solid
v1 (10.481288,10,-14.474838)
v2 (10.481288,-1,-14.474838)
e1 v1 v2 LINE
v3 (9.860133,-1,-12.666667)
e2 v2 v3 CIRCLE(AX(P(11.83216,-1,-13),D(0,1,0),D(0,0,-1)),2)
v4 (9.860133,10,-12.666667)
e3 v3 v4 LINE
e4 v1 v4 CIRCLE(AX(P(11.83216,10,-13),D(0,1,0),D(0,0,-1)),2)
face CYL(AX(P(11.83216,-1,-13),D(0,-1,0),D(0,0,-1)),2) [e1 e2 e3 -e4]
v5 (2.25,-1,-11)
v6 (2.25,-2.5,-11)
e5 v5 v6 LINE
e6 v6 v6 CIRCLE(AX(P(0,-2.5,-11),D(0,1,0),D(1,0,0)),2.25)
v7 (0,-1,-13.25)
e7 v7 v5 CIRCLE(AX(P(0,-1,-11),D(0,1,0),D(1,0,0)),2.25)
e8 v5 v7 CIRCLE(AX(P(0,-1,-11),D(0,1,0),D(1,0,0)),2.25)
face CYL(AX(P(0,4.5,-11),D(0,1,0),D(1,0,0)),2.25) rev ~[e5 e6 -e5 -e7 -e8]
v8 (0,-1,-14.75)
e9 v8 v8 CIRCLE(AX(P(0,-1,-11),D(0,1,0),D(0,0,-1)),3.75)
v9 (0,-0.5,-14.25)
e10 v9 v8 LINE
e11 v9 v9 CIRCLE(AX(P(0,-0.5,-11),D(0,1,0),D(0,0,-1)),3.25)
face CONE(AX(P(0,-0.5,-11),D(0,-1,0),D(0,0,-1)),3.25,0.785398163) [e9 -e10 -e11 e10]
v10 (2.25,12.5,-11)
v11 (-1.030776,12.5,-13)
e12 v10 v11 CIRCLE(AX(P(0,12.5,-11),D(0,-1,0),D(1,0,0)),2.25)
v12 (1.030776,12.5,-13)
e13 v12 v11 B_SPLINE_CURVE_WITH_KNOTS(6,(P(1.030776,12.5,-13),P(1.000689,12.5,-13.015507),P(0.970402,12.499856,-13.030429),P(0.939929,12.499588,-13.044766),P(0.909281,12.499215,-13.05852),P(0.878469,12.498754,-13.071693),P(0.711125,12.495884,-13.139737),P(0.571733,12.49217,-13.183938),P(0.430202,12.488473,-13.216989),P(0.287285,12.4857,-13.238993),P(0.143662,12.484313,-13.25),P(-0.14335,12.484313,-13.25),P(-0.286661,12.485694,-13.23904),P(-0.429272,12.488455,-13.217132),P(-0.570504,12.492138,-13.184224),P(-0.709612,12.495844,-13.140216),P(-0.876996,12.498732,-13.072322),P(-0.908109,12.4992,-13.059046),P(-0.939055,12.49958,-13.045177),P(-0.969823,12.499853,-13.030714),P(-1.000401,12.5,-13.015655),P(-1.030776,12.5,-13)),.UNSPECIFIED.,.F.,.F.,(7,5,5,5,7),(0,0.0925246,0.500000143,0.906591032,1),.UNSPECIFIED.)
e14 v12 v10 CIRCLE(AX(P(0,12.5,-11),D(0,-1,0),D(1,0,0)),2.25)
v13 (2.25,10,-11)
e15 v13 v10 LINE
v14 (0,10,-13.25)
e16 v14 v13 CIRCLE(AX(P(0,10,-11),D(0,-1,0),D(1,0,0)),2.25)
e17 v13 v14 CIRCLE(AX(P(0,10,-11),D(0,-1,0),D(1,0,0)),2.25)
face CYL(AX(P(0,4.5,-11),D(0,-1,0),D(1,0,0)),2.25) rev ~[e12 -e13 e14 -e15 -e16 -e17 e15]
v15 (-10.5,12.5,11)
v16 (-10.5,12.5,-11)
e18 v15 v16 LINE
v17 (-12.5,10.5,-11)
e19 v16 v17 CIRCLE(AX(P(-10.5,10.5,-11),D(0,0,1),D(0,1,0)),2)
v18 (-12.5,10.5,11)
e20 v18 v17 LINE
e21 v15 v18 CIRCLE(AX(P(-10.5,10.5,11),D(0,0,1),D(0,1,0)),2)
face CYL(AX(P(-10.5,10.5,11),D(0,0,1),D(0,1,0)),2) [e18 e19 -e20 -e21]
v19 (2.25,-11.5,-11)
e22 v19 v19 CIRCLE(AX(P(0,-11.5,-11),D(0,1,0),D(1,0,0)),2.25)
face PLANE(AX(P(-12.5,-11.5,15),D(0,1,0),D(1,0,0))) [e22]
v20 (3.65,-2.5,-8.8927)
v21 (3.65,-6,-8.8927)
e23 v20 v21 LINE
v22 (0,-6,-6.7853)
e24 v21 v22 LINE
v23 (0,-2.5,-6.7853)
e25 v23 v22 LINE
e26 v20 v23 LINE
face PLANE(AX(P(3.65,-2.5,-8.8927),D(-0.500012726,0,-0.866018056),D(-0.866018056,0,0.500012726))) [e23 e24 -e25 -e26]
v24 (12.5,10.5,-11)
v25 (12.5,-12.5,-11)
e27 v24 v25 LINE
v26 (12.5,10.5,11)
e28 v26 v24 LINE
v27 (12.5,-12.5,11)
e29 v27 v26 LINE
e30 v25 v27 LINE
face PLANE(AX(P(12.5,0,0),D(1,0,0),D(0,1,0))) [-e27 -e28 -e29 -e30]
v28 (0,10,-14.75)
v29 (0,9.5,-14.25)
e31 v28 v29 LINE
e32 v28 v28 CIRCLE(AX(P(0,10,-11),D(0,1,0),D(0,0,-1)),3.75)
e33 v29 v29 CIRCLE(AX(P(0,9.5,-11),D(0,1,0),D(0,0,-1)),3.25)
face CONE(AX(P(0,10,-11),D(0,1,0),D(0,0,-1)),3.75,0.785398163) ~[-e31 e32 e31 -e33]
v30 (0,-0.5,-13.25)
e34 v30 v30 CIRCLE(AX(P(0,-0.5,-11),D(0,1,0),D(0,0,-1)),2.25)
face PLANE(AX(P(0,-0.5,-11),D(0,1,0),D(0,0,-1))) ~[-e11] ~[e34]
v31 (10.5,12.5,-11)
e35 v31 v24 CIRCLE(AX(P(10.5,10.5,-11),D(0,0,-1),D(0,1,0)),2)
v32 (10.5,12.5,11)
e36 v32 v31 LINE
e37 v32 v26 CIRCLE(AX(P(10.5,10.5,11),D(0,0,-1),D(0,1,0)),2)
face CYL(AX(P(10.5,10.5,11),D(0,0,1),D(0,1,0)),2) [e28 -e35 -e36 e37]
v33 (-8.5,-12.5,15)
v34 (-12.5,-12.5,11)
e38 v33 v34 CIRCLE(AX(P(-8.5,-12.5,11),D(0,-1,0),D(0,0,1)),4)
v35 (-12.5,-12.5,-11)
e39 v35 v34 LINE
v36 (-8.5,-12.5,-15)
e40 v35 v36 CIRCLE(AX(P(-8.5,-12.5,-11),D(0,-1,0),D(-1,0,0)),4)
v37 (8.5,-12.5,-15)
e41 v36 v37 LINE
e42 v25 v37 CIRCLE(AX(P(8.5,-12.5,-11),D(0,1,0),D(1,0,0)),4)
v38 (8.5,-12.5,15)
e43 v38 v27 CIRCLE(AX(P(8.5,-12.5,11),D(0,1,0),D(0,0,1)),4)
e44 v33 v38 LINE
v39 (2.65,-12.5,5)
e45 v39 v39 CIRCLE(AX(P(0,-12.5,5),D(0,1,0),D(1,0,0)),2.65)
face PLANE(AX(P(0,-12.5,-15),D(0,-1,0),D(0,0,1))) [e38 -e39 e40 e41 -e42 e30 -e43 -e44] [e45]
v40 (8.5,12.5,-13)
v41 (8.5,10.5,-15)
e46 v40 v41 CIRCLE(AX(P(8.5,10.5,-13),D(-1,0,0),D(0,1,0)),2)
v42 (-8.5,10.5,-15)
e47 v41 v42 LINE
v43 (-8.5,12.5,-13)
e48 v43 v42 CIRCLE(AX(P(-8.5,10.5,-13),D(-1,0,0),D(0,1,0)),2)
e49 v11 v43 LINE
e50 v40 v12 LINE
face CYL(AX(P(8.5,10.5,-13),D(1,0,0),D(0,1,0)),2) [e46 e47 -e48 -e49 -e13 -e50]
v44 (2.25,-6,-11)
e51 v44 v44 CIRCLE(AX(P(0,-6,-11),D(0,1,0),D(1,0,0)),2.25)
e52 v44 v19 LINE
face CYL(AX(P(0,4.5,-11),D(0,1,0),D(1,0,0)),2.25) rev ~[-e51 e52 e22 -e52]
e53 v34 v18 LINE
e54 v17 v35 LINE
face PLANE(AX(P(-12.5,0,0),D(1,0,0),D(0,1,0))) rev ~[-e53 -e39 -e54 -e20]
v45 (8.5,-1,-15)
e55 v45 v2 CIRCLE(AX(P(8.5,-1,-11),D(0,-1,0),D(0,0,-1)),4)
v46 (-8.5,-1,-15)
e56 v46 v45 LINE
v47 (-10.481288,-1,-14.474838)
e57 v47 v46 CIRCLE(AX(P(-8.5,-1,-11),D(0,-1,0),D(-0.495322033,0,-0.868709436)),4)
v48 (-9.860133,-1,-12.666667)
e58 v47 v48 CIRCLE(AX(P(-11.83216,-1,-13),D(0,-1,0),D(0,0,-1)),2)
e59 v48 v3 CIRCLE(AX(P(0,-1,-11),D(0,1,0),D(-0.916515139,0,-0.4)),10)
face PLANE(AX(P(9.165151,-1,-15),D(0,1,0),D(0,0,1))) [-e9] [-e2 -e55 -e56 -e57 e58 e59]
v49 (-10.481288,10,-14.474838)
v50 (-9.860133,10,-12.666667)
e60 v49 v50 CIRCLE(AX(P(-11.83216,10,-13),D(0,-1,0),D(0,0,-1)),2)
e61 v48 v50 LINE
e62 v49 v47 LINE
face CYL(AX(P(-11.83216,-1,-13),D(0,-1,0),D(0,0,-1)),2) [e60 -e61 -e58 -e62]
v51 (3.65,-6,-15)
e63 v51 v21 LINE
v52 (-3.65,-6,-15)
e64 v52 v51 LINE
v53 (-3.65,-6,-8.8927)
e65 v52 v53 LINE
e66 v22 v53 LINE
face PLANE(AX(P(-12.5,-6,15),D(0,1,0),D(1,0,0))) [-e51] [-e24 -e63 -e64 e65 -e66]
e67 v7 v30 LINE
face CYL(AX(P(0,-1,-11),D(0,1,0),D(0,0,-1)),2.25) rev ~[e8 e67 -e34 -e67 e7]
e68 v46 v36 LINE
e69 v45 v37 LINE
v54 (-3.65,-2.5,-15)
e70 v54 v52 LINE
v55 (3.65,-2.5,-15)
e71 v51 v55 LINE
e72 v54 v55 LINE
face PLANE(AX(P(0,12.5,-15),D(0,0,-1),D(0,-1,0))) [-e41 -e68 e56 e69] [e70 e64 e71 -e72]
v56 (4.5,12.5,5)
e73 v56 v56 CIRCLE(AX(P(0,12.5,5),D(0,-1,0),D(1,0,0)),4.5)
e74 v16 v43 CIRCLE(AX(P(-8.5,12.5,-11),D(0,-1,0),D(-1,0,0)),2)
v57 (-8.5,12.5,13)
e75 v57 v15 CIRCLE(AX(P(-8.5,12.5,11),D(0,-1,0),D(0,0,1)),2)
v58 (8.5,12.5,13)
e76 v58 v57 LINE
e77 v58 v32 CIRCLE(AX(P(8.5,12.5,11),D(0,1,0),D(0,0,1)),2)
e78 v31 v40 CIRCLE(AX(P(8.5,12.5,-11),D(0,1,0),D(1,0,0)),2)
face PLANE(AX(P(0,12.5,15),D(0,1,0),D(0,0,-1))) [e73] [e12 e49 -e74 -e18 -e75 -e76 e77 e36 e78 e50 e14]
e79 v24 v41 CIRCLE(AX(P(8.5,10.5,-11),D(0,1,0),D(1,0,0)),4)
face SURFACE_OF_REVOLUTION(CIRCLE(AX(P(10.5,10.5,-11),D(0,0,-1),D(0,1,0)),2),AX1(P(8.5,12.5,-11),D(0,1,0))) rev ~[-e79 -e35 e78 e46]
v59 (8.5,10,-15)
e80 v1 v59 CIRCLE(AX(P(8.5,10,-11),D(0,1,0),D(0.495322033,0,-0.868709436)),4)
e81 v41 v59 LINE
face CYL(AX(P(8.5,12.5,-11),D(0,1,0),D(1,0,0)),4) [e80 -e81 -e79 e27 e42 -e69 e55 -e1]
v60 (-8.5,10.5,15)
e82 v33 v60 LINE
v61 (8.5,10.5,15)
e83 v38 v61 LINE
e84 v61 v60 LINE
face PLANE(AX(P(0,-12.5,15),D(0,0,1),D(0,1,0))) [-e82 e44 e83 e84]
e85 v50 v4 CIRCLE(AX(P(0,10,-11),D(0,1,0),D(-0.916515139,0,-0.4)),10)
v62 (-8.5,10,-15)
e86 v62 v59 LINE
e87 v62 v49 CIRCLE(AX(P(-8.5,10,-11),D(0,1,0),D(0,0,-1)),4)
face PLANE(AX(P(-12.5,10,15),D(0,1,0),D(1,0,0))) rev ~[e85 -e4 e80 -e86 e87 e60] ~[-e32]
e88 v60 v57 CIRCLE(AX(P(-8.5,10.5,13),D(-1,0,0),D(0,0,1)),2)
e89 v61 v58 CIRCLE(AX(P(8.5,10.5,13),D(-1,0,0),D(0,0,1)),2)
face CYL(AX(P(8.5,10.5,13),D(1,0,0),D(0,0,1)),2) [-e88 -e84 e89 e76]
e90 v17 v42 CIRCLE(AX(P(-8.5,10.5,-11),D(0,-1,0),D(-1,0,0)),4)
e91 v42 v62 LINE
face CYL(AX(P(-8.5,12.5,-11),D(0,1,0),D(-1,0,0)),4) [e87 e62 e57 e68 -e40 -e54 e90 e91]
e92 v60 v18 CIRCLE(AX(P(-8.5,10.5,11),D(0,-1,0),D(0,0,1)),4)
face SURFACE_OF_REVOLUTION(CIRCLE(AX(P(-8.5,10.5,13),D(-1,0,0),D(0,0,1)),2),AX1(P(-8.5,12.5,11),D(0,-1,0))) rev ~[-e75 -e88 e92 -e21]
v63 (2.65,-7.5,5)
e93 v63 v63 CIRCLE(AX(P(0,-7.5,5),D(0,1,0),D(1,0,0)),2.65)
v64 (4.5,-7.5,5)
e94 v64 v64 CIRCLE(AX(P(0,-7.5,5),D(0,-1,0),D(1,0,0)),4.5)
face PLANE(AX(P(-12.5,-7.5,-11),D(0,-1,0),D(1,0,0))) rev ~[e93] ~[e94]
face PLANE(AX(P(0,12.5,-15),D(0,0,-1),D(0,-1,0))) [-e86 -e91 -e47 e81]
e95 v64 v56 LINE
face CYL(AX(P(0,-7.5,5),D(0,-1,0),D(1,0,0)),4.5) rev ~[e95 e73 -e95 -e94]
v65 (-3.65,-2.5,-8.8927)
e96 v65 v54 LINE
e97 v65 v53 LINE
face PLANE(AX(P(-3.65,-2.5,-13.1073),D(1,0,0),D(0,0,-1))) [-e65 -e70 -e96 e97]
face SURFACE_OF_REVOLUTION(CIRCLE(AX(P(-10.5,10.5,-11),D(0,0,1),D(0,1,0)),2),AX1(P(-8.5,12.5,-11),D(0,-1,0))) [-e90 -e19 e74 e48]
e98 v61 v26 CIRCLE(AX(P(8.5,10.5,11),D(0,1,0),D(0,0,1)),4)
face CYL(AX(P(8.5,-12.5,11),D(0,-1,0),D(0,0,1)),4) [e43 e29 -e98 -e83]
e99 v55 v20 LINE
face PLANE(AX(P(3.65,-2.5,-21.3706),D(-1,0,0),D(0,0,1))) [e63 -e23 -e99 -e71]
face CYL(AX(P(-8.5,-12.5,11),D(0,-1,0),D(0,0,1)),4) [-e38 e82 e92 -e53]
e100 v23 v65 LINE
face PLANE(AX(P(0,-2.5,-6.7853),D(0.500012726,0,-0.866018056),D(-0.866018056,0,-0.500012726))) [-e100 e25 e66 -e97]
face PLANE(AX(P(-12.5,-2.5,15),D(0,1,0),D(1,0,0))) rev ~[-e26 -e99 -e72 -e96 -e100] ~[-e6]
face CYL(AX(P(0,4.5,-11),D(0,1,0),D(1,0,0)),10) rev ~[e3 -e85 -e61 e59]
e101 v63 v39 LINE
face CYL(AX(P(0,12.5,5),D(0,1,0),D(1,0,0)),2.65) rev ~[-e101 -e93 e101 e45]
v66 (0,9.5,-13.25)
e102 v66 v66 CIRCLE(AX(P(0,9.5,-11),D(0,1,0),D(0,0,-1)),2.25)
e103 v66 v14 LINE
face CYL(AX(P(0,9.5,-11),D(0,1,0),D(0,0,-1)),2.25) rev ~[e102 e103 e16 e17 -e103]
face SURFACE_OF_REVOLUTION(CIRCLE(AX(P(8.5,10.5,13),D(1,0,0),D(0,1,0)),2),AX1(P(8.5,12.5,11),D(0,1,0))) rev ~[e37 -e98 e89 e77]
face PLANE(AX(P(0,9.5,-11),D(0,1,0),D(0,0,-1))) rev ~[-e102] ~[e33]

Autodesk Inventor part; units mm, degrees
sketch "Sketch1" plane through (0, 0, 0) normal (1, 0, 0) x (0, 1, 0)
  line L0 (-12.5, 15) -> (12.5, 15)
  line L1 (12.5, 15) -> (12.5, -15)
  line L2 (12.5, -15) -> (-12.5, -15)
  line L3 (-12.5, -15) -> (-12.5, 15)
  line L4 (-12.5, 15) -> (12.5, -15) construction
  line L5 (12.5, 15) -> (-12.5, -15) construction
  point P0 (0, 0)
  dimension "d0" = 30
  dimension "d1" = 25
extrude "Extrusion1" add sketch "Sketch1" along normal mid plane 25
sketch "Sketch5" plane through (-12.5, 12.5, 15) normal (0, 1, 0) x (1, 0, 0)
  line L0 (0, 30) -> (0, 0) projected
  line L1 (25, 0) -> (25, 30) projected
  circle A0 centre (12.5, 10) radius 2.65
  line L2 (12.5, 10) -> (12.5, 0) construction
  line L3 (0, 0) -> (25, 0) projected
  point P0 (12.5, 15)
  dimension "d22" = 5.3
  dimension "d25" = 10
extrude "Extrusion5" cut sketch "Sketch5" against normal through all
ref_plane "Work Plane1" through (-12.5, 4.5, 15) normal (0, 1, 0) x (1, 0, 0)
sketch "Sketch2" plane through (-12.5, 4.5, 15) normal (0, 1, 0) x (1, 0, 0)
  circle A0 centre (12.5, 26) radius 9 construction
  circle A1 centre (12.5, 26) radius 1.75 construction
  line L0 (0, 30) -> (25, 30) construction
  line L1 (12.5, 30) -> (12.5, 26)
  circle A2 centre (12.5, 26) radius 10
  point P0 (12.5, 15)
  dimension "d5" = 4
  dimension "d6" = 3.5
  dimension "d7" = 18
  dimension "d8" = 1
extrude "Extrusion2" cut sketch "Sketch2" against normal mid plane 11
sketch "Sketch3" plane through (-12.5, 4.5, 15) normal (0, 1, 0) x (1, 0, 0)
  arc A0 (3.3348, 30) -> (21.6652, 30) centre (12.5, 26) ccw projected
  circle A1 centre (12.5, 26) radius 2.25
  point P0 (12.5, 15)
  point P1 (20, 16)
  point P2 (0, 16)
  dimension "d11" = 4.5
extrude "Extrusion3" cut sketch "Sketch3" along normal blind 10 and the other way blind 16
ref_plane "Work Plane2" through (-12.5, -2.5, 15) normal (0, 1, 0) x (1, 0, 0)
sketch "Sketch4" plane through (-12.5, -2.5, 15) normal (0, 1, 0) x (1, 0, 0)
  circle A0 centre (12.5, 26) radius 2.25 projected
  line L0 (12.5, 30.2147) -> (16.15, 28.1073) construction
  line L1 (16.15, 28.1073) -> (16.15, 23.8927)
  line L2 (16.15, 23.8927) -> (12.5, 21.7853)
  line L3 (12.5, 21.7853) -> (8.85, 23.8927)
  line L4 (8.85, 23.8927) -> (8.85, 28.1073)
  line L5 (8.85, 28.1073) -> (12.5, 30.2147) construction
  line L6 (8.85, 28.1073) -> (8.85, 36.3706)
  line L7 (8.85, 36.3706) -> (16.15, 36.3706)
  line L8 (16.15, 36.3706) -> (16.15, 28.1073)
  point P0 (12.5, 15)
  dimension "d46" = 7.3
extrude "Extrusion4" cut sketch "Sketch4" against normal blind 3.5
fillet "Fillet1" radius 2 2 edges at (9.1652, 4.5, -15) (-9.1652, 4.5, -15)
fillet "Fillet1" radius 4 4 edges at (12.5, 0, -15) (-12.5, 0, -15) (-12.5, 0, 15) (12.5, 0, 15)
fillet "Fillet1" radius 2 4 edges at (12.5, 12.5, 0) (0, 12.5, 15) (-12.5, 12.5, 0) (0, 12.5, -15)
ref_plane "Work Plane3" through (-12.5, -7.5, -11) normal (0, -1, 0) x (1, 0, 0)
sketch "Sketch6" plane through (-12.5, -7.5, -11) normal (0, -1, 0) x (1, 0, 0)
  circle A0 centre (12.5, 16) radius 2.65 projected
  circle A1 centre (12.5, 16) radius 4.5
  point P0 (12.5, 11)
  dimension "d27" = 9
extrude "Extrusion6" cut sketch "Sketch6" against normal through all contours A0 | A1
sketch "Sketch9" plane through (0, 0, 0) normal (1, 0, 0) x (0, 1, 0)
  line L0 (-17.5, -11) -> (17.5, -11) projected
  line L1 (-1, -8.75) -> (-1, -13.25) projected
  line L2 (10, -13.25) -> (10, -8.75) projected
  line L3 (10, -13.25) -> (10, -14.75)
  line L4 (10, -14.75) -> (9.5, -14.25)
  line L5 (9.5, -14.25) -> (9.5, -13.25)
  line L6 (9.5, -13.25) -> (10, -13.25)
  line L7 (-1, -13.25) -> (-0.5, -13.25)
  line L8 (-0.5, -13.25) -> (-0.5, -14.25)
  line L9 (-0.5, -14.25) -> (-1, -14.75)
  line L10 (-1, -14.75) -> (-1, -13.25)
  point P0 (0, 0)
  dimension "d38" = 0.5
  dimension "d39" = 1
  dimension "d40" = 45
  dimension "d41" = 0.5
  dimension "d42" = 1
  dimension "d43" = 45
revolve "Revolution1" add sketch "Sketch9" angle 360 about axis through (0, 4.5, -11) along (0, 1, 0)
properties part number "YIdler"
